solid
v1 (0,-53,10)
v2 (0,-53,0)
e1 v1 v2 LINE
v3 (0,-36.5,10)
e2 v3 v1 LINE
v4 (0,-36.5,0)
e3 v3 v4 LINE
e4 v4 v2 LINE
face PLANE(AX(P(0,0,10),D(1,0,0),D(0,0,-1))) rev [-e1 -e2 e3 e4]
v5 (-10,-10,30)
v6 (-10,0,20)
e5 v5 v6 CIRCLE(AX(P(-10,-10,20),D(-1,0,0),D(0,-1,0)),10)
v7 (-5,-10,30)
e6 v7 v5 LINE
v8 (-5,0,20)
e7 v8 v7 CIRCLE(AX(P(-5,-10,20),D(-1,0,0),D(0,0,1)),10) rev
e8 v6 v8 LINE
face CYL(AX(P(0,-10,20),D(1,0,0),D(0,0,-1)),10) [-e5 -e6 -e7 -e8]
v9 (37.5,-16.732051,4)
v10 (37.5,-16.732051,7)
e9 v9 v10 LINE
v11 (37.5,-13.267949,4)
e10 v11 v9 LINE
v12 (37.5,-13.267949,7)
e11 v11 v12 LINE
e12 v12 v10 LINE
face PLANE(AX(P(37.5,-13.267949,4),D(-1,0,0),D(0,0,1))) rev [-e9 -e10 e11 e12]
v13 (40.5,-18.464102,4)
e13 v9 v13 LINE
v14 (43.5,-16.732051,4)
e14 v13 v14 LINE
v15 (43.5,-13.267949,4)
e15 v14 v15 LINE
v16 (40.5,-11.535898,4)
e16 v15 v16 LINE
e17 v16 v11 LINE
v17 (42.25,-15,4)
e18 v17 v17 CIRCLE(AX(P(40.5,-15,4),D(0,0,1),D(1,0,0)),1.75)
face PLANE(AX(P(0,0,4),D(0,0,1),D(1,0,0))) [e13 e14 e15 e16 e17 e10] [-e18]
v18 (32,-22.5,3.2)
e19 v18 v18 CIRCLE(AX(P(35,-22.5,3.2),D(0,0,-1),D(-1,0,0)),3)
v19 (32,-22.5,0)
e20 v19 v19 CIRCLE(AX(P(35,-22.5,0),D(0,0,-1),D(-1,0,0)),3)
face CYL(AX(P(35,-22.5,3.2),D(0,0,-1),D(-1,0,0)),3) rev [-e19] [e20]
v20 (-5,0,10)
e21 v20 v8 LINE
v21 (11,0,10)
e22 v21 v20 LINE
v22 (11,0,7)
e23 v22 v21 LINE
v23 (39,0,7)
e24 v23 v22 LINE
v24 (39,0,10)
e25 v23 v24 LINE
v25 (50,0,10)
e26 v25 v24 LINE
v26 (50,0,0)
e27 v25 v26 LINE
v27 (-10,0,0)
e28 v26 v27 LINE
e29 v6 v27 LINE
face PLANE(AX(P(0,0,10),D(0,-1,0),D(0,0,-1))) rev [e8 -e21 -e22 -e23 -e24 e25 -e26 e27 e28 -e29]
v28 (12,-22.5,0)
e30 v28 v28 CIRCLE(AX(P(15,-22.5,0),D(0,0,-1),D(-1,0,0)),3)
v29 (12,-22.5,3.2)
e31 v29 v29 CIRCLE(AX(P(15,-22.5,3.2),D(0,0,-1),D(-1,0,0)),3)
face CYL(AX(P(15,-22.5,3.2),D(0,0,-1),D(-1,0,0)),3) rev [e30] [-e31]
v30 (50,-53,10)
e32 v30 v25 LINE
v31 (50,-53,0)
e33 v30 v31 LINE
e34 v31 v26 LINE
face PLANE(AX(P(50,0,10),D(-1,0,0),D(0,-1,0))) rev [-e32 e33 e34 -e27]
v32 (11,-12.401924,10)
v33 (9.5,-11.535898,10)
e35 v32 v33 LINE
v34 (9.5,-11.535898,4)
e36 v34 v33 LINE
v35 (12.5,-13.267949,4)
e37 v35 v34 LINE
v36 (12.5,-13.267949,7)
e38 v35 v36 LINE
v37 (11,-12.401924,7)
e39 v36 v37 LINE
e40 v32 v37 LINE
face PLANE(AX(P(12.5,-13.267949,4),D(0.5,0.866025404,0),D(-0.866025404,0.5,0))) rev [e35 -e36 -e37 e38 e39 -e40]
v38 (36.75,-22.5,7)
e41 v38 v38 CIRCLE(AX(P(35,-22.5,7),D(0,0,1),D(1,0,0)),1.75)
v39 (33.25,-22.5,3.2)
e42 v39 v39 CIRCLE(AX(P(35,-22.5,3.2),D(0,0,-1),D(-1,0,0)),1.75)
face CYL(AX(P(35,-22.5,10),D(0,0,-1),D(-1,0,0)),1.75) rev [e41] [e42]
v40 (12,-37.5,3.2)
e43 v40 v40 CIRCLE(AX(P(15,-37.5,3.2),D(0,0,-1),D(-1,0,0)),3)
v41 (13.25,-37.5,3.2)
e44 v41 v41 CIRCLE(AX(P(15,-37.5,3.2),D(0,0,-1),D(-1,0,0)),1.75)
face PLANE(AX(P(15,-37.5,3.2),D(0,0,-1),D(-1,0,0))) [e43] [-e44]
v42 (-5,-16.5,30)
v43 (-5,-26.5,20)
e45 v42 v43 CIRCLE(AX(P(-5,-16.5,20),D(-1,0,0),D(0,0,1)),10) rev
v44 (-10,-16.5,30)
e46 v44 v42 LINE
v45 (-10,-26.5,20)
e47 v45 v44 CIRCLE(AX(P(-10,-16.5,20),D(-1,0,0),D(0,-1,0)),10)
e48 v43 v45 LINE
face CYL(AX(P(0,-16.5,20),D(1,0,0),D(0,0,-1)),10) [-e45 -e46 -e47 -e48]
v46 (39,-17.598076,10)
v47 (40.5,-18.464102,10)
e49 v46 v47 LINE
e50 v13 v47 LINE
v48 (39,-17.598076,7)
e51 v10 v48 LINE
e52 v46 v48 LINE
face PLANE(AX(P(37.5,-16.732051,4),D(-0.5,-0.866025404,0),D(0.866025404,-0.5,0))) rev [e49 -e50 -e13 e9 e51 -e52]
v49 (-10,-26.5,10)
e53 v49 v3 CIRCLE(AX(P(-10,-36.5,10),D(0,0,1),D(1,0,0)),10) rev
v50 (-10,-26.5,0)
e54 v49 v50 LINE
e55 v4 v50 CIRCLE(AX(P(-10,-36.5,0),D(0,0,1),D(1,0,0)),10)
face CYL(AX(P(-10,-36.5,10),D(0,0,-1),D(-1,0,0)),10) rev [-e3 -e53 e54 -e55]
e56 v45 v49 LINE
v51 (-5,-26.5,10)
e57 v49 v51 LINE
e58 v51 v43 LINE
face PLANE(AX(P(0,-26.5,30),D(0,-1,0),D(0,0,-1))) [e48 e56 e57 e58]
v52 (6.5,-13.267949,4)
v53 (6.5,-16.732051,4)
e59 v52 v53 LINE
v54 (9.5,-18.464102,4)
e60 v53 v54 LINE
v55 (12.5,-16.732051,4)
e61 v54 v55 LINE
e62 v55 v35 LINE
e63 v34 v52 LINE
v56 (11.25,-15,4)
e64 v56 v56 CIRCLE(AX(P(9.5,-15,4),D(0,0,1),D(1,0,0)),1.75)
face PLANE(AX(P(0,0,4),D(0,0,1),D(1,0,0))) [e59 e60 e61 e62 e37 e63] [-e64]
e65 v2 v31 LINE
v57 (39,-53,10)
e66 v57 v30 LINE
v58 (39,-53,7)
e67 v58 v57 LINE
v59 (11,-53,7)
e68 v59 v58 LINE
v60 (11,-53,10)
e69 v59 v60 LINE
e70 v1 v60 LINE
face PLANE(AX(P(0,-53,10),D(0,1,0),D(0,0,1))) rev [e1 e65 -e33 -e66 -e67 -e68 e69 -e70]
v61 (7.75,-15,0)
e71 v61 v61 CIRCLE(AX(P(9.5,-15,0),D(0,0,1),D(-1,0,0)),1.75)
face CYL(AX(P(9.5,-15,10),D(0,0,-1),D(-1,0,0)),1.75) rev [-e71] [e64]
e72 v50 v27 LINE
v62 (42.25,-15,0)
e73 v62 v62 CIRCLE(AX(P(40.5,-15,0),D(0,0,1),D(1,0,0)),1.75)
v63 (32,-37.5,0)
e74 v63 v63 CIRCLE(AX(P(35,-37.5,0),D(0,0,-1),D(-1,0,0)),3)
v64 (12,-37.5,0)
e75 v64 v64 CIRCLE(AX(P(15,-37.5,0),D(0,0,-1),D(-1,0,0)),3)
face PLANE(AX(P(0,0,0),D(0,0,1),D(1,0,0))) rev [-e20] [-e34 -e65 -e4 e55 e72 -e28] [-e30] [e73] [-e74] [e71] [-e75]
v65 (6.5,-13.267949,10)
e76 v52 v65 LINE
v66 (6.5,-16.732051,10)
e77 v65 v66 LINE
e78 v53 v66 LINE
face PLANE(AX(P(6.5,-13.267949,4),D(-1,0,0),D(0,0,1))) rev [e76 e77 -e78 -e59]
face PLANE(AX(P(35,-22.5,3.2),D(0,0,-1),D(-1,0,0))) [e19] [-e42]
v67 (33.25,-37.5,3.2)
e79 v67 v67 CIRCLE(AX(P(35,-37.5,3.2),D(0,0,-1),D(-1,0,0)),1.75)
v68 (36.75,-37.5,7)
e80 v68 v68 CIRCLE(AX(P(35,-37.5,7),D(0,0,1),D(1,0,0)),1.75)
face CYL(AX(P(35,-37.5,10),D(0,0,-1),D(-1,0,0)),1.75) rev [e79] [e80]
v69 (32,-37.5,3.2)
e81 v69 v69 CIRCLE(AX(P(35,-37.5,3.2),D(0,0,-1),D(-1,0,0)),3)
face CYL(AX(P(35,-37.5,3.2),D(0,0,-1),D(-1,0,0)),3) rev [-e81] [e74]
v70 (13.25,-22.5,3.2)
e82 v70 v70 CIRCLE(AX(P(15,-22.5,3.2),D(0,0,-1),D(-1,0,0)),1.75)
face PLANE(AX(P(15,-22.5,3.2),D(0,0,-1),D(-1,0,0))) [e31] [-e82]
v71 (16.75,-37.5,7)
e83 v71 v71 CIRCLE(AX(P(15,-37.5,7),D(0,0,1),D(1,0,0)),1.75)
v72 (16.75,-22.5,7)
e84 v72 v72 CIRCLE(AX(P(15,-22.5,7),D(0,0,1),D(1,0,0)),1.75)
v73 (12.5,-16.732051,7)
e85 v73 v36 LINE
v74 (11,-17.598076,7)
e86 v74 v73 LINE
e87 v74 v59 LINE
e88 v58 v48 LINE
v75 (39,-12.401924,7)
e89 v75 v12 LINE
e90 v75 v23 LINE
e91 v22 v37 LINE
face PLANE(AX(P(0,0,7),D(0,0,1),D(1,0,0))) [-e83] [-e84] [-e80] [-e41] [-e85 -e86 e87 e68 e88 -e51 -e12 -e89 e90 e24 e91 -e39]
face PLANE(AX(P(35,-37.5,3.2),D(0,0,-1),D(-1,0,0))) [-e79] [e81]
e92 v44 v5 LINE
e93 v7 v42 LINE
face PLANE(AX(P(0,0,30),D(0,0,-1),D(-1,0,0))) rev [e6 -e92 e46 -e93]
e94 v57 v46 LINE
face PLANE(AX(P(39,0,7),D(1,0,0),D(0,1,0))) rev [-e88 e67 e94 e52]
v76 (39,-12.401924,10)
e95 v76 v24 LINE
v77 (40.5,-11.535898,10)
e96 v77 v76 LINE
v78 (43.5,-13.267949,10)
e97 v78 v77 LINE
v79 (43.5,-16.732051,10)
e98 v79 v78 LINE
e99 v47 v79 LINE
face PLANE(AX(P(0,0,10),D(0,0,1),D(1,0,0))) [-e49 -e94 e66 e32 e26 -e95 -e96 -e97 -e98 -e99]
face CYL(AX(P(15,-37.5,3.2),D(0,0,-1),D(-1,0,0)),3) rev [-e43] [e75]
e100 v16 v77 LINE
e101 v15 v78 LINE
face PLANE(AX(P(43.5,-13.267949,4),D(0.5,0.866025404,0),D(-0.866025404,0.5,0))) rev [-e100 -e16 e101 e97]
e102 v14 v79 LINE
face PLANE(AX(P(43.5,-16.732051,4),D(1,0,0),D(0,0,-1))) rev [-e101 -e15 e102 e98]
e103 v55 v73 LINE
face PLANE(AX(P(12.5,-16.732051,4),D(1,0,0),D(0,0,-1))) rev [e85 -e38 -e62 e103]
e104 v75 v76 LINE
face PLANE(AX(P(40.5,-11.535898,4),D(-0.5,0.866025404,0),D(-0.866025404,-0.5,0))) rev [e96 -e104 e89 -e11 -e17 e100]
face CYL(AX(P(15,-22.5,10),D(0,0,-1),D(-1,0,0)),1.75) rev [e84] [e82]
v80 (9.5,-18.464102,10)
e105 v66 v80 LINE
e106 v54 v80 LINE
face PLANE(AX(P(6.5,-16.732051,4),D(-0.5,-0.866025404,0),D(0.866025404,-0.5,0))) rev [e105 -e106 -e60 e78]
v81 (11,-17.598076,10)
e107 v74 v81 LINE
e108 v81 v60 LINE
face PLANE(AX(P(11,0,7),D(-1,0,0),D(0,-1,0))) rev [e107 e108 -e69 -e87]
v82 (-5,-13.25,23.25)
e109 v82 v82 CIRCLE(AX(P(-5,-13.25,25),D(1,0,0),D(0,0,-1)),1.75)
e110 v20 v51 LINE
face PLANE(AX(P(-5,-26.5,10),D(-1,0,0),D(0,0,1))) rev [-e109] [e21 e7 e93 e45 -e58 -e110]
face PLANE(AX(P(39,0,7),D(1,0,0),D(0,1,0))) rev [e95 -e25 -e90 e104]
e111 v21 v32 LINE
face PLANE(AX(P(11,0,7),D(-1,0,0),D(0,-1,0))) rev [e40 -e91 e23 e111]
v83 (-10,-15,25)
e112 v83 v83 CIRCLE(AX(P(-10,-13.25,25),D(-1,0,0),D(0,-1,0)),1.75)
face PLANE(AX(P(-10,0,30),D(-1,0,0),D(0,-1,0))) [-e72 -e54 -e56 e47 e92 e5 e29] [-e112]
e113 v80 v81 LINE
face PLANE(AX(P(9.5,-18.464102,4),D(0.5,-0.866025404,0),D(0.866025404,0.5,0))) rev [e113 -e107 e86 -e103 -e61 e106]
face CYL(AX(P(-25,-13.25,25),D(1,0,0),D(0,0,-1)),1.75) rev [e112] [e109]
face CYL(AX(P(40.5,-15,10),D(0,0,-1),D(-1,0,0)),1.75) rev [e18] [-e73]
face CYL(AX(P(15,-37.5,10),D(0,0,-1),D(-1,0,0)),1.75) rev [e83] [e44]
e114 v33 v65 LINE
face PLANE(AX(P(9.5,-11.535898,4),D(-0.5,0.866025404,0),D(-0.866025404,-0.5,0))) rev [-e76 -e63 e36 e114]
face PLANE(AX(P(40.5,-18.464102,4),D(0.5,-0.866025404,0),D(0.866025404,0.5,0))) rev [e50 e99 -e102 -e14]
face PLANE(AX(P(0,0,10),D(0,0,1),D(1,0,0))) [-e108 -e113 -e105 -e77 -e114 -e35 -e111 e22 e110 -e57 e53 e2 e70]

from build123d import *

# Parameters (mm, degrees)
SKETCH_1_W          = 50
SKETCH_1_H          = 53
SKETCH_1_R          = 1.75
EXTRUDE_1_DEPTH     = 10
SKETCH_2_W          = 28
SKETCH_2_H          = 53
CUT_EXTRUDE_1_DEPTH = 3
CUT_EXTRUDE_2_DEPTH = 6
SKETCH_5_R          = 3
CUT_EXTRUDE_4_DEPTH = 3.2
SKETCH_6_W          = 10
SKETCH_6_H          = 26.5
EXTRUDE_2_DEPTH     = 30
SKETCH_7_W          = 5
SKETCH_7_H          = 26.5
CUT_EXTRUDE_5_DEPTH = 20
FILLET_2_R          = 10
FILLET_3_R          = 10
SKETCH_8_R          = 1.75
CUT_EXTRUDE_6_DEPTH = 20


with BuildPart() as part:
    # 草图1 → 凸台-拉伸1 (new body)
    with BuildSketch(Plane.XY):
        with Locations((25, -26.5)):
            Rectangle(SKETCH_1_W, SKETCH_1_H)
        with Locations((35, -22.5)):
            Circle(SKETCH_1_R, mode=Mode.SUBTRACT)
        with Locations((40.5, -15)):
            Circle(SKETCH_1_R, mode=Mode.SUBTRACT)
        with Locations((35, -37.5)):
            Circle(SKETCH_1_R, mode=Mode.SUBTRACT)
        with Locations(Location((15, -37.5, 0), (0, 0, 180))):
            Circle(SKETCH_1_R, mode=Mode.SUBTRACT)
        with Locations(Location((15, -22.5, 0), (0, 0, 180))):
            Circle(SKETCH_1_R, mode=Mode.SUBTRACT)
        with Locations(Location((9.5, -15, 0), (0, 0, 180))):
            Circle(SKETCH_1_R, mode=Mode.SUBTRACT)
    extrude(amount=EXTRUDE_1_DEPTH)

    # 草图2 → 切除-拉伸1 (cut)
    with BuildSketch(Plane.XY.offset(10)):
        with Locations((25, -26.5)):
            Rectangle(SKETCH_2_W, SKETCH_2_H)
    extrude(amount=-CUT_EXTRUDE_1_DEPTH, mode=Mode.SUBTRACT)

    # 草图3 → 切除-拉伸2 (cut)
    with BuildSketch(Plane.XY.offset(10)):
        Polygon((9.5, -18.464101615), (12.5, -16.732050808), (12.5, -13.267949192), (9.5, -11.535898385), (6.5, -13.267949192), (6.5, -16.732050808), align=None)
        Polygon((40.5, -18.464101615), (43.5, -16.732050808), (43.5, -13.267949192), (40.5, -11.535898385), (37.5, -13.267949192), (37.5, -16.732050808), align=None)
    extrude(amount=-CUT_EXTRUDE_2_DEPTH, mode=Mode.SUBTRACT)

    # 草图5 → 切除-拉伸4 (cut)
    with BuildSketch(Plane(origin=(0, 0, 0), x_dir=(-1, 0, 0), z_dir=(0, 0, -1))):
        with Locations((-35, -37.5)):
            Circle(SKETCH_5_R)
        with Locations((-35, -22.5)):
            Circle(SKETCH_5_R)
        with Locations((-15, -37.5)):
            Circle(SKETCH_5_R)
        with Locations((-15, -22.5)):
            Circle(SKETCH_5_R)
    extrude(amount=-CUT_EXTRUDE_4_DEPTH, mode=Mode.SUBTRACT)

    # 草图6 → 凸台-拉伸2 (add)
    with BuildSketch(Plane(origin=(0, 0, 0), x_dir=(-1, 0, 0), z_dir=(0, 0, -1))):
        with Locations((5, -13.25)):
            Rectangle(SKETCH_6_W, SKETCH_6_H)
    extrude(amount=-EXTRUDE_2_DEPTH)

    # 草图7 → 切除-拉伸5 (cut)
    with BuildSketch(Plane.XY.offset(30)):
        with Locations((-2.5, -13.25)):
            Rectangle(SKETCH_7_W, SKETCH_7_H)
    extrude(amount=-CUT_EXTRUDE_5_DEPTH, mode=Mode.SUBTRACT)

    # 圆角2
    fillet_2_edges = [part.edges().sort_by_distance(p)[0] for p in [
        (-7.5, 0, 30),
        (-7.5, -26.5, 30),
    ]]
    fillet(fillet_2_edges, radius=FILLET_2_R)

    # 圆角3
    # the kernel refuses this fillet: 10 mm, written as the material it adds along each edge
    with BuildSketch(Plane(origin=(0, -26.5, 0), x_dir=(-1, 0, 0), z_dir=(0, 0, 1))) as fillet_3_piece_1:
        with BuildLine():
            CenterArc((FILLET_3_R, FILLET_3_R), FILLET_3_R, 180, 90)
            Line((0, FILLET_3_R), (0, 0))
            Line((0, 0), (FILLET_3_R, 0))
        make_face()
    extrude(amount=10)

    # 草图8 → 切除-拉伸6 (cut)
    with BuildSketch(Plane(origin=(-5, 0, 0), x_dir=(0, 0, -1), z_dir=(1, 0, 0))):
        with Locations((-25, -13.25)):
            Circle(SKETCH_8_R)
    extrude(amount=-CUT_EXTRUDE_6_DEPTH, mode=Mode.SUBTRACT)


solid = part.part
